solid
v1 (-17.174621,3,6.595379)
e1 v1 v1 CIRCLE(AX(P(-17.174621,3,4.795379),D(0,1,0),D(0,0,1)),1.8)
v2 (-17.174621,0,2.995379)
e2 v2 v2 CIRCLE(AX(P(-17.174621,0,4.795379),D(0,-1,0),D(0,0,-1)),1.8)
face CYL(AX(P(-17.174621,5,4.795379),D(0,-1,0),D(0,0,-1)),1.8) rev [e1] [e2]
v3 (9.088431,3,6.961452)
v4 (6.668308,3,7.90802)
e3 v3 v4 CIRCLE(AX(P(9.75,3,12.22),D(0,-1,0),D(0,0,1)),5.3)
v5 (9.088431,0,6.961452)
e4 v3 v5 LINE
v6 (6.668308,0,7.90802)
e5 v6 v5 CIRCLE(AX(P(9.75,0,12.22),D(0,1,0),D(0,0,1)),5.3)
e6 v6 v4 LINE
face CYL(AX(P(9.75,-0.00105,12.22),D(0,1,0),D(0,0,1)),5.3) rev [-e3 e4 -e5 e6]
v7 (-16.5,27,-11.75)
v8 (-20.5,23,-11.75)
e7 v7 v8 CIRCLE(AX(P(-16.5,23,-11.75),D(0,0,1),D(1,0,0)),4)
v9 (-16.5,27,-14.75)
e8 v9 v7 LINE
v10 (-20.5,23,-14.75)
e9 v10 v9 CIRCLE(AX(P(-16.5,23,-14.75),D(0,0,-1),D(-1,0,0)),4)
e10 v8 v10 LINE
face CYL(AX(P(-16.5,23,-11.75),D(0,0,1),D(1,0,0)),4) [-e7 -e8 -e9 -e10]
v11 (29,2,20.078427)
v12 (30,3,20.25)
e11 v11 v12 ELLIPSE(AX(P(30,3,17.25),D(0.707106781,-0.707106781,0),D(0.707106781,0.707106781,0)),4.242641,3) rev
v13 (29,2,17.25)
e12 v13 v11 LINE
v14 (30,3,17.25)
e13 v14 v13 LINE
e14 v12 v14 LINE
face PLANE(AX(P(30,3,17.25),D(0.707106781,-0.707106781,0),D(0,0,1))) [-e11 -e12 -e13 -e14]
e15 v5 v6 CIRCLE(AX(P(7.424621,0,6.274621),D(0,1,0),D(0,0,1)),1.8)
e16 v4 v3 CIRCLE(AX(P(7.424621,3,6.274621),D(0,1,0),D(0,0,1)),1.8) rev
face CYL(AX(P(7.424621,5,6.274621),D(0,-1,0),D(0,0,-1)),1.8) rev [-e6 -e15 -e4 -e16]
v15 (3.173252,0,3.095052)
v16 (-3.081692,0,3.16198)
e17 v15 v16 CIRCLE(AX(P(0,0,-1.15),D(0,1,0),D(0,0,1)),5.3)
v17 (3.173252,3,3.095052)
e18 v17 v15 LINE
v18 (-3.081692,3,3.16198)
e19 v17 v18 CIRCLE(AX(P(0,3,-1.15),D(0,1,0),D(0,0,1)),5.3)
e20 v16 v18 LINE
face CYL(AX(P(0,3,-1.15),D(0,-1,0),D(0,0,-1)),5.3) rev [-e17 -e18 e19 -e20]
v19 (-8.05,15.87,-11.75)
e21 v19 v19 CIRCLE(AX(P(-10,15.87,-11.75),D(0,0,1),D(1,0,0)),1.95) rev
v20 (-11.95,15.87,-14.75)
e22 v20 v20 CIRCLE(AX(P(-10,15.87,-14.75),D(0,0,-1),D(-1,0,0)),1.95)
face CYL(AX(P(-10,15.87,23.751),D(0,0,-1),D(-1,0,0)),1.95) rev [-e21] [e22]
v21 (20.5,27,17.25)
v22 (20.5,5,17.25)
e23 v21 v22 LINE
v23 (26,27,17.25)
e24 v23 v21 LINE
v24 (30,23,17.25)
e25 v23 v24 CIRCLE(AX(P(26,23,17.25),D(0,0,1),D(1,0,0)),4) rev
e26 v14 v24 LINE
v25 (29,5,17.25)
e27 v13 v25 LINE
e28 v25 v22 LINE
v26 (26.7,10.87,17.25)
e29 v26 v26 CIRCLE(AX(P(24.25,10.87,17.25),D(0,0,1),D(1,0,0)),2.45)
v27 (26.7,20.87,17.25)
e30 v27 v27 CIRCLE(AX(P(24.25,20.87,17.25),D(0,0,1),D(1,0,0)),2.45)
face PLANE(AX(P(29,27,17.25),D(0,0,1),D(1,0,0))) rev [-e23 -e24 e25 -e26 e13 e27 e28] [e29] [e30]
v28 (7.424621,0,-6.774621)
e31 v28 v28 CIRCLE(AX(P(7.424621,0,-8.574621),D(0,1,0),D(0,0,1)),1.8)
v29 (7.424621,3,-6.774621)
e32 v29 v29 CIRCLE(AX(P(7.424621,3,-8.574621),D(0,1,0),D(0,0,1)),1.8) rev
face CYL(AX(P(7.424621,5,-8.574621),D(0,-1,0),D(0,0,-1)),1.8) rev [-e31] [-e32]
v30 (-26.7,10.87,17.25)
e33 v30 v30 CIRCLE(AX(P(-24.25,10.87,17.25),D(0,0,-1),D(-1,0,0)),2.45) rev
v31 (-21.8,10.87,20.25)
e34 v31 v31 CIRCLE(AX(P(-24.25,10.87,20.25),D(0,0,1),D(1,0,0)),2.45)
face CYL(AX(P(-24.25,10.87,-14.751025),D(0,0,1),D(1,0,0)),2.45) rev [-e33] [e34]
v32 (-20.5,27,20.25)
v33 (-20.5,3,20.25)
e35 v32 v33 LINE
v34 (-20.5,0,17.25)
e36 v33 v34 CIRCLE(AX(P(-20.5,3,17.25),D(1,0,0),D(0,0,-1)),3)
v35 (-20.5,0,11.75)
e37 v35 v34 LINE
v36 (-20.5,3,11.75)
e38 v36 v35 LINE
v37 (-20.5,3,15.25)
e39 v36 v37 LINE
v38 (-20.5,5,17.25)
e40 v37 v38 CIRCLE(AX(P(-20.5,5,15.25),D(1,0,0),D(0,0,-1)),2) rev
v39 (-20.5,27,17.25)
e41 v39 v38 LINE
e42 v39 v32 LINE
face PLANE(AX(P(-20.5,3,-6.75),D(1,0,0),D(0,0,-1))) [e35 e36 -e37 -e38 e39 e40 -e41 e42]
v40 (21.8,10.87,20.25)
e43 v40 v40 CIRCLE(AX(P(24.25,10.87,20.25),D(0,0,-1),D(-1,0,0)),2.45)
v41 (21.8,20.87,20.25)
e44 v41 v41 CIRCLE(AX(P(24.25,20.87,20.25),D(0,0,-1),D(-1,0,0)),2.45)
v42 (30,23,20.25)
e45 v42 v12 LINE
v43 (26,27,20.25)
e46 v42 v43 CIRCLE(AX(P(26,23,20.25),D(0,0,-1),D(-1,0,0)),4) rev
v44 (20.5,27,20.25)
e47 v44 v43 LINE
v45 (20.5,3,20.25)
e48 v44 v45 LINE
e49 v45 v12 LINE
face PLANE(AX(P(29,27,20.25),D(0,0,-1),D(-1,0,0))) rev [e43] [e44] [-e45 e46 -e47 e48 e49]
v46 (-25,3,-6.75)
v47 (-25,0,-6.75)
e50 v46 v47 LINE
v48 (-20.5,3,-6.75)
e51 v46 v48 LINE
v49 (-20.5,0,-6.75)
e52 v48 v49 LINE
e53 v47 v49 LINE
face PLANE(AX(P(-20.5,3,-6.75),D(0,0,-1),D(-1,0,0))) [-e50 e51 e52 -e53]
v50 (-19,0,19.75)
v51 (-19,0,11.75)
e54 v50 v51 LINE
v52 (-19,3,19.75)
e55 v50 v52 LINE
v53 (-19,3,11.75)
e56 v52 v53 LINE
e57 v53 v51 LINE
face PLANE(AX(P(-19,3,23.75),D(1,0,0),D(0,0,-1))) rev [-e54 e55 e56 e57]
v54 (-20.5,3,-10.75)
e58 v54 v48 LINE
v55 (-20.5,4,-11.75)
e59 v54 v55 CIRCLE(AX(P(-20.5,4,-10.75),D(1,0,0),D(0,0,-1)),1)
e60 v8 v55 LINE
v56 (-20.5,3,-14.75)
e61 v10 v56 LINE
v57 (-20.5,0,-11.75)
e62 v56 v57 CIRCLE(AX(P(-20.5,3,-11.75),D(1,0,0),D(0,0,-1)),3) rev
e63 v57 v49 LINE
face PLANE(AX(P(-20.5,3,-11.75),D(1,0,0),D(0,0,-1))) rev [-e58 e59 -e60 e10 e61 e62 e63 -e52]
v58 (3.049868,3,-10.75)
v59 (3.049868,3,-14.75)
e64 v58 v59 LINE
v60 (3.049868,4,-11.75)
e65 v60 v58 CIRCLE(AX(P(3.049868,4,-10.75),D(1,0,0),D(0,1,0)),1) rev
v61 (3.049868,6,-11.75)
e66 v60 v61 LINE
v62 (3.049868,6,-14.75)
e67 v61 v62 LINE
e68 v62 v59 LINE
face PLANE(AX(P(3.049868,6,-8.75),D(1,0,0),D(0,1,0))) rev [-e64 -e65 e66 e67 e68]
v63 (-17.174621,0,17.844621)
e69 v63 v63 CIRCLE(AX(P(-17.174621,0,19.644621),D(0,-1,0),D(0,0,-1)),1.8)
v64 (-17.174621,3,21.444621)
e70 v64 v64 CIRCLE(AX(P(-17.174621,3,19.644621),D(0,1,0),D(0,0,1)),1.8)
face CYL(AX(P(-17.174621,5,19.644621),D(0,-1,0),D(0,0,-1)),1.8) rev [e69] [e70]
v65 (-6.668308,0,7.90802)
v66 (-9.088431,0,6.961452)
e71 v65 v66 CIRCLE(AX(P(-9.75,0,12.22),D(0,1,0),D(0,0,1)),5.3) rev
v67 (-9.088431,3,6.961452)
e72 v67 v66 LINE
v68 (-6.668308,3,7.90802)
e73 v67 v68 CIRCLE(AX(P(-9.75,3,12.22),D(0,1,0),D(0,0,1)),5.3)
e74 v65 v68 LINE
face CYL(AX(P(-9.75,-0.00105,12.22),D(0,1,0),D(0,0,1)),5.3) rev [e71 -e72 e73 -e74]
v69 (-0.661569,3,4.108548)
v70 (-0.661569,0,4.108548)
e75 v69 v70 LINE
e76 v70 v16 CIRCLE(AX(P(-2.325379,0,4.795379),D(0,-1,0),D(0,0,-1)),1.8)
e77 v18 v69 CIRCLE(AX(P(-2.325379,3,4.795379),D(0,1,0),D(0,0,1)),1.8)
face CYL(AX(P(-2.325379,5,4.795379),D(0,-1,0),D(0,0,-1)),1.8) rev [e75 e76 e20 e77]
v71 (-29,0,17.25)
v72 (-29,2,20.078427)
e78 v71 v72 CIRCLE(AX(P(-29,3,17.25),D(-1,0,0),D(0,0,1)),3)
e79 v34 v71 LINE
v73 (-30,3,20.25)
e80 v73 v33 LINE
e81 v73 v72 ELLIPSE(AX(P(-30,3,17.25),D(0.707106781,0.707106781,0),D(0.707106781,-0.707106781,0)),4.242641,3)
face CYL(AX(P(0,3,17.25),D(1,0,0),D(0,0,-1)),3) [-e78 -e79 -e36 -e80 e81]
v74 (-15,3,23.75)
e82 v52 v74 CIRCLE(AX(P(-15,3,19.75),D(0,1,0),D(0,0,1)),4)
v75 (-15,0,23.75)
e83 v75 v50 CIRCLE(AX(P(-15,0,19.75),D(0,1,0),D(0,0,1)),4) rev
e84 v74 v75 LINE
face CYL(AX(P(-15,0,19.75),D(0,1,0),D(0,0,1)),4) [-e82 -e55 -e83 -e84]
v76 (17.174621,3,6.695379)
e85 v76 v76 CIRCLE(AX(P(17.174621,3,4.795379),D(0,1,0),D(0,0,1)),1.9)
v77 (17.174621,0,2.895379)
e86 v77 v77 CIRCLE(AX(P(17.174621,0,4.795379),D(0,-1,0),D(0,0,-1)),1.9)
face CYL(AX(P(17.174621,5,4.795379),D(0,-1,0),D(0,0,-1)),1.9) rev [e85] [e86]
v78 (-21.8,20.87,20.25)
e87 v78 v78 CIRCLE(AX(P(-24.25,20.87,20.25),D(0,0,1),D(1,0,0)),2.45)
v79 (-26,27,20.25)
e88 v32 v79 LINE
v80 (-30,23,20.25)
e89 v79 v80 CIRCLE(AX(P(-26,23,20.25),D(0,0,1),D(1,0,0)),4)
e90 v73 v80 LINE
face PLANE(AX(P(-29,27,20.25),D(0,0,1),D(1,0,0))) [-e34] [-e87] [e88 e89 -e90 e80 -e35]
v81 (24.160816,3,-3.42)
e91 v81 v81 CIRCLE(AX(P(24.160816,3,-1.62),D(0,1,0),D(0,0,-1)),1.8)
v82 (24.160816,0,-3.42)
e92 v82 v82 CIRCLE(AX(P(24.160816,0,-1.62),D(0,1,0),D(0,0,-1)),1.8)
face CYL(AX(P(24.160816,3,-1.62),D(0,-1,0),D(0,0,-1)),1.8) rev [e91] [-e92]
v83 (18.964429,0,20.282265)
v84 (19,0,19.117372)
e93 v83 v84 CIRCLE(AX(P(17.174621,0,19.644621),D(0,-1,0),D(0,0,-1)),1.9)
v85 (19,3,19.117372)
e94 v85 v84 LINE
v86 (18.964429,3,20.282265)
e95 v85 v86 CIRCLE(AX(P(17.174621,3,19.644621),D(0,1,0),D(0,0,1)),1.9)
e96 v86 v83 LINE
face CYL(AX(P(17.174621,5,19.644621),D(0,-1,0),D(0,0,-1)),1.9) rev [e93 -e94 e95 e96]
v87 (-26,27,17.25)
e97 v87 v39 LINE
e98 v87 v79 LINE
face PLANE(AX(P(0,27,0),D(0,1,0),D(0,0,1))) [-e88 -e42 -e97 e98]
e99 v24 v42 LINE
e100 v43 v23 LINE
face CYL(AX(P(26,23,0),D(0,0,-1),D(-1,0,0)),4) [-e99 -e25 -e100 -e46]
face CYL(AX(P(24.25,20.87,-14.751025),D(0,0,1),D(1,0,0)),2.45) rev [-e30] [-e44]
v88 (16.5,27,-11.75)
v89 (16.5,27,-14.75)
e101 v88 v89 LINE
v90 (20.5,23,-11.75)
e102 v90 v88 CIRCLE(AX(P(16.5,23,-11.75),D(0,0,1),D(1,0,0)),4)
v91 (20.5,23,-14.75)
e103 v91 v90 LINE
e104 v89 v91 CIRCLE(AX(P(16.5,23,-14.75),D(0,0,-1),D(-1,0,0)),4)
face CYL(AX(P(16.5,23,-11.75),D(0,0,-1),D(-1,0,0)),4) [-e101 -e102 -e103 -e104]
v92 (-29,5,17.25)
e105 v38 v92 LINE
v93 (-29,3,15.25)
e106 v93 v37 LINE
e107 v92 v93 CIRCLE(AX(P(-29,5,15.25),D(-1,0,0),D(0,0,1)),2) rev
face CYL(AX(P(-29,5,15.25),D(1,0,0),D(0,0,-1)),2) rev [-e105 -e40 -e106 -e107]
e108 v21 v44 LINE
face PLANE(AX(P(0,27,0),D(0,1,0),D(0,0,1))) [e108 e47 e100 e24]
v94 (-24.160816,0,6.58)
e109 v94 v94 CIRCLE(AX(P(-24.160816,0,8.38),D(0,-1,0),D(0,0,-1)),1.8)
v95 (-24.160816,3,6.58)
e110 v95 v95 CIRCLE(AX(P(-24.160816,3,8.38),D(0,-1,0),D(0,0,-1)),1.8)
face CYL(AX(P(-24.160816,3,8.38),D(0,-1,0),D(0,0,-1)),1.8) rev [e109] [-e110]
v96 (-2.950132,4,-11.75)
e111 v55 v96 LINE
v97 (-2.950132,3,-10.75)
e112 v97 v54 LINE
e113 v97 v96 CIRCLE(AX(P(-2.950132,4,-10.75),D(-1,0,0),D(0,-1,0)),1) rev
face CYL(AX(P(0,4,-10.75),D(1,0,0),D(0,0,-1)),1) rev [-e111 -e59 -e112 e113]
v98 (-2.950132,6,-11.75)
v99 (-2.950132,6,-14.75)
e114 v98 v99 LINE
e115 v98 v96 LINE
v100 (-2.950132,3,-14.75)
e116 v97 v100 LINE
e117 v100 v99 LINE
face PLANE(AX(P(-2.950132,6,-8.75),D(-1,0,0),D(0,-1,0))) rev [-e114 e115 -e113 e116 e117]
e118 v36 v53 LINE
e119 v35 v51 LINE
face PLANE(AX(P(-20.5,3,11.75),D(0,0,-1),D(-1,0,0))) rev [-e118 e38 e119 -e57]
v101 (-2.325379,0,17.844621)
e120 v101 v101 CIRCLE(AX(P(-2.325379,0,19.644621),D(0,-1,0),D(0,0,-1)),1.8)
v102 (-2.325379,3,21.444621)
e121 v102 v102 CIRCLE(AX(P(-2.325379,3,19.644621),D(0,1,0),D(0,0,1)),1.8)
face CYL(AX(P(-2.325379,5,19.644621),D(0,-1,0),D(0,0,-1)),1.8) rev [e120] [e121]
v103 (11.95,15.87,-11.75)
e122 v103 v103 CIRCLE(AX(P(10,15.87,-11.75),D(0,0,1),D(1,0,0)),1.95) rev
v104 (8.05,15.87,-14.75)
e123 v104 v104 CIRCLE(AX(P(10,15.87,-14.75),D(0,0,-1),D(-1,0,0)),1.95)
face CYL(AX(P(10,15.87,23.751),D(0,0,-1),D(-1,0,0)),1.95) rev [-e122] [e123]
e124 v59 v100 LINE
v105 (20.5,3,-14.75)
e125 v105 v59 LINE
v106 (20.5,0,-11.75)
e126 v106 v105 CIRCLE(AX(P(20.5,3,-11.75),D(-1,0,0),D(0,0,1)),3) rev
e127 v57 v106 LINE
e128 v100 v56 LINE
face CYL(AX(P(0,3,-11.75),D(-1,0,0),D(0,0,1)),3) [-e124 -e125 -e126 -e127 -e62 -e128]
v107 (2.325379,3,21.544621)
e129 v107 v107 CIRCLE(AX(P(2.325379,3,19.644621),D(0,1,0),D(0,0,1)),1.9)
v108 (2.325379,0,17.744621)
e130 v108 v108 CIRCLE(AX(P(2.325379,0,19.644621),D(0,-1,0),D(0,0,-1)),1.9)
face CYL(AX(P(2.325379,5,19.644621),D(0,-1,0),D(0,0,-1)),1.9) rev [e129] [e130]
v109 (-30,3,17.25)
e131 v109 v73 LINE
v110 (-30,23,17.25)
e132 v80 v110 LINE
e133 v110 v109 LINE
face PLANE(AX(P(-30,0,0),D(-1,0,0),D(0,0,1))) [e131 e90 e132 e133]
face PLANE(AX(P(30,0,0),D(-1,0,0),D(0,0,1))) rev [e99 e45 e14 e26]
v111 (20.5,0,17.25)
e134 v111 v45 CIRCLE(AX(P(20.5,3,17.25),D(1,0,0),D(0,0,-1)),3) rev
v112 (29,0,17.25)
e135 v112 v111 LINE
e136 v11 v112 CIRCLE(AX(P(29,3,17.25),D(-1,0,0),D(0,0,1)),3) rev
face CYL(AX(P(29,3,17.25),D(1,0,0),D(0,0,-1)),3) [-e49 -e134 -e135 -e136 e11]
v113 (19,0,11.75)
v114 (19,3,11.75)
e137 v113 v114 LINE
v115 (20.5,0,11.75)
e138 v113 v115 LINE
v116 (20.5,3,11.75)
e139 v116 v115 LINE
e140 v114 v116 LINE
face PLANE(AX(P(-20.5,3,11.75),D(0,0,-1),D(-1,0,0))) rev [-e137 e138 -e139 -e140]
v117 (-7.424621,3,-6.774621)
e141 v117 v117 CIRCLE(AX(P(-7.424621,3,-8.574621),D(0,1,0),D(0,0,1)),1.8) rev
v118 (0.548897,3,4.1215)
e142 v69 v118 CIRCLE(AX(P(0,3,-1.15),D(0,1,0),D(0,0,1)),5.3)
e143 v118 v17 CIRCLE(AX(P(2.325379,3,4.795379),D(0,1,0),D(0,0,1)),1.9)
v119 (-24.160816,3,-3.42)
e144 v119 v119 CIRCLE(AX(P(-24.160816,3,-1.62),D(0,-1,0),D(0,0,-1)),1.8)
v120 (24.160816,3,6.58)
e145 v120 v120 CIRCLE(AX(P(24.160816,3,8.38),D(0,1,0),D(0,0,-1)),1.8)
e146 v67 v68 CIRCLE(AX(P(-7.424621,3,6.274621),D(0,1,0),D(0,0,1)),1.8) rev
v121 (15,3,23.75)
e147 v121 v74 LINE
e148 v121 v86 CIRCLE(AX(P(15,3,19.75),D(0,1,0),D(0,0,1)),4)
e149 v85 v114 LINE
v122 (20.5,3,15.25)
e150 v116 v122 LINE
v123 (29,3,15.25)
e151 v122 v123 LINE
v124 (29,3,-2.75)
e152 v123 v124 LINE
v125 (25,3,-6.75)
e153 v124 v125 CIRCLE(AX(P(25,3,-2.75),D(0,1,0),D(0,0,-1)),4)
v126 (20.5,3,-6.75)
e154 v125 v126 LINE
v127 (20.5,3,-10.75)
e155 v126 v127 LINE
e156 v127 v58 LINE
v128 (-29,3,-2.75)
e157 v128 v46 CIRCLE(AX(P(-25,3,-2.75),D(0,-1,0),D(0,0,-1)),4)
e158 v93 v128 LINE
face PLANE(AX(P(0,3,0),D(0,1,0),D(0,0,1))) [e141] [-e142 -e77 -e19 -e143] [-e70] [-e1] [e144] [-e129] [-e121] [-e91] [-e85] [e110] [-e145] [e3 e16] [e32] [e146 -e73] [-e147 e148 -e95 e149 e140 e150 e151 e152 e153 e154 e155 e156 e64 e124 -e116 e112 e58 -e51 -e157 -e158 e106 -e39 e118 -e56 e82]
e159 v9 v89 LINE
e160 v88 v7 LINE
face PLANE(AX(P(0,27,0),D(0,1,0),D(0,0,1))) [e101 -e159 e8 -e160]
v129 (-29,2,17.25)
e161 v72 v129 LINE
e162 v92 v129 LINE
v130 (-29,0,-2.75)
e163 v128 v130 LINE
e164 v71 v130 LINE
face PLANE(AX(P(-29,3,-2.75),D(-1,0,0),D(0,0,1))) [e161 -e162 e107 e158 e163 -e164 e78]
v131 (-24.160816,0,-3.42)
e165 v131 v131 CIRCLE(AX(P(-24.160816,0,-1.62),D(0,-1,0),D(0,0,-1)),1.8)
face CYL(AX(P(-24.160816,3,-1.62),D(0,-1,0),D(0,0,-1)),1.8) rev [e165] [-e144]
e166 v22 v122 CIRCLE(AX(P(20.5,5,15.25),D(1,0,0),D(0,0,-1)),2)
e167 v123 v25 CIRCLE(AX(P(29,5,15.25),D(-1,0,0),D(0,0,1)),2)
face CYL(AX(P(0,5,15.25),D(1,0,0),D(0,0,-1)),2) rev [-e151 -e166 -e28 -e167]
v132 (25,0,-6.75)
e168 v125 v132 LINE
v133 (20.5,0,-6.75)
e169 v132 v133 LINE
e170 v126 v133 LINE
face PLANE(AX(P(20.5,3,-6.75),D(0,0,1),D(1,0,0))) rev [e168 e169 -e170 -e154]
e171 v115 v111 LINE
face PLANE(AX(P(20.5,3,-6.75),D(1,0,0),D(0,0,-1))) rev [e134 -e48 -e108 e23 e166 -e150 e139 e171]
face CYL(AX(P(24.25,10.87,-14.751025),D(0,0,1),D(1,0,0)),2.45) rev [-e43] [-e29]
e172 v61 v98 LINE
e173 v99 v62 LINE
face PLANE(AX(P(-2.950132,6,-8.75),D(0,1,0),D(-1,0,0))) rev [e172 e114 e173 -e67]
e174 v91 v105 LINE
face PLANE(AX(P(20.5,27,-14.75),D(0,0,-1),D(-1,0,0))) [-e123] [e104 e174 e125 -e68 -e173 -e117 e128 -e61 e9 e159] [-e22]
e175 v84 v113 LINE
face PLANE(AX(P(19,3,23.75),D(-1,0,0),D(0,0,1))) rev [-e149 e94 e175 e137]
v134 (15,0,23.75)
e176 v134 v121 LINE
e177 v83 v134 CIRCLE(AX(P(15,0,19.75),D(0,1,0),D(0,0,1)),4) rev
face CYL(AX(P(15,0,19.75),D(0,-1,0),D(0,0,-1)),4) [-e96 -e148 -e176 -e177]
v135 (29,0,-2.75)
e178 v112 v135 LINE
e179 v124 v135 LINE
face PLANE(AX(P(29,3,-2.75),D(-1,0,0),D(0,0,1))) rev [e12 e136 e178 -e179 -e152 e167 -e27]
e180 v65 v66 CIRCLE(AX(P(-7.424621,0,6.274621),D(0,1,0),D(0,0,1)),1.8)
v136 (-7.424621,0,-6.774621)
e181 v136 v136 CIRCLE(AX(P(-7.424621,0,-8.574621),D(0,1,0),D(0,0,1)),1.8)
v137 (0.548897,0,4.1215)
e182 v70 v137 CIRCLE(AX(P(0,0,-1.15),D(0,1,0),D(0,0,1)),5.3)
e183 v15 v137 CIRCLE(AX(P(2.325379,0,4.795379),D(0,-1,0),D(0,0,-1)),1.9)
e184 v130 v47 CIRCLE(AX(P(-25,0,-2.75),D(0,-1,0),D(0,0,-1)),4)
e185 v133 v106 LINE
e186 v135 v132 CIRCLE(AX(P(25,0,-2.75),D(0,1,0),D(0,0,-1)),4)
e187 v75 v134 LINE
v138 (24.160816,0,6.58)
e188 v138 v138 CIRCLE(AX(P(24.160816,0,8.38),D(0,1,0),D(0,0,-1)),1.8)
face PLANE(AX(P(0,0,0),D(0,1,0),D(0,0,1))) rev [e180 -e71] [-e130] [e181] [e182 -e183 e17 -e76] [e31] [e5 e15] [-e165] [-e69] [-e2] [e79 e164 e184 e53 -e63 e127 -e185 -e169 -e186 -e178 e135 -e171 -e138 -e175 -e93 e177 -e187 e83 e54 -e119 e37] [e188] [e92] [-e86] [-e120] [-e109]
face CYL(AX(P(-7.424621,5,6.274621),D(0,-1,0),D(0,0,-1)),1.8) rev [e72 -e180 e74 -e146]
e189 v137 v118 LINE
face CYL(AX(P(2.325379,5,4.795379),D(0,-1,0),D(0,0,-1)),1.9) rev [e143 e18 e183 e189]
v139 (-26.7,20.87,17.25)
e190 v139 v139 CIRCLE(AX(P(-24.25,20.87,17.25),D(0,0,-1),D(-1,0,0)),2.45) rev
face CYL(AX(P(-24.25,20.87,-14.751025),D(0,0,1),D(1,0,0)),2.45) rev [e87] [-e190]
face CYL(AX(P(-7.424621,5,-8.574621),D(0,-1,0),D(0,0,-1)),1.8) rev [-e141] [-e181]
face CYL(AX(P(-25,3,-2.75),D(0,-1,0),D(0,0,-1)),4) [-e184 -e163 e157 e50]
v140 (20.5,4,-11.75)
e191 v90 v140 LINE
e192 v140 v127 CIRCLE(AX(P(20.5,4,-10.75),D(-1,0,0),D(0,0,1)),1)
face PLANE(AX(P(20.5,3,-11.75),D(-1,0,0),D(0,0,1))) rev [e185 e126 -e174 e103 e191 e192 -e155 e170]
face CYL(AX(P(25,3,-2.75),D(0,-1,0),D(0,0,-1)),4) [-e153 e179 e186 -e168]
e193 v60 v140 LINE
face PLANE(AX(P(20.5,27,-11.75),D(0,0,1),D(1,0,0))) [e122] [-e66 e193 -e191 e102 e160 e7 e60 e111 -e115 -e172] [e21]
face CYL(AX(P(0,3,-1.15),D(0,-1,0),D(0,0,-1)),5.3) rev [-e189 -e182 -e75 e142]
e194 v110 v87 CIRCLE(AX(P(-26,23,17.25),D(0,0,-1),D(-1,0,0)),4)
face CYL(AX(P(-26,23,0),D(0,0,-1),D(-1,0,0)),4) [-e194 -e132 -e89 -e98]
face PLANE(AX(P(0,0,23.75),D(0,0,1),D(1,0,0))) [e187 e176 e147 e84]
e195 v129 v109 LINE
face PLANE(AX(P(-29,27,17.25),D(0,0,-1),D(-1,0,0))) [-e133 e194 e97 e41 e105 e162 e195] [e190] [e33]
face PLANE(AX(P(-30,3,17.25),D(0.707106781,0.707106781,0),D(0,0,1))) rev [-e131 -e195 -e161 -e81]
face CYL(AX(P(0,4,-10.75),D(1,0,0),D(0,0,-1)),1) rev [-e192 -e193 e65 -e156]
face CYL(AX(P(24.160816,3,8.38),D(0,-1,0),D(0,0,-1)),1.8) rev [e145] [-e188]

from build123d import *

# Parameters (mm, degrees)
CROQUIS1_W              = 41
CROQUIS1_H              = 23.5
CROQUIS1_R              = 5.3
SALIENTE_EXTRUIR1_DEPTH = 3
CROQUIS3_W              = 41
CROQUIS3_H              = 3
SALIENTE_EXTRUIR2_DEPTH = 27
CROQUIS4_R              = 1.8
SALIENTE_EXTRUIR3_DEPTH = 3
CROQUIS5_W              = 8.5
CROQUIS5_H              = 3
SALIENTE_EXTRUIR4_DEPTH = 27
CROQUIS6_W              = 38
CROQUIS6_H              = 3
SALIENTE_EXTRUIR5_DEPTH = 12
CORTAR_EXTRUIR3_REACH   = 54.868
CROQUIS10_R             = 2.45
CROQUIS16_W             = 3
CROQUIS16_H             = 24
SALIENTE_EXTRUIR6_DEPTH = 1
CROQUIS17_W             = 3
CROQUIS17_H             = 24
SALIENTE_EXTRUIR7_DEPTH = 1
CORTAR_EXTRUIR1_REACH   = 47.167
CROQUIS8_R              = 5.3
CORTAR_EXTRUIR2_REACH   = 57.779
CROQUIS9_R              = 1.95
REDONDEO1_R             = 4
REDONDEO2_R             = 3
REDONDEO3_R             = 1
REDONDEO4_R             = 2
CROQUIS11_R             = 1.8
CORTAR_EXTRUIR4_DEPTH   = 5
CROQUIS12_R             = 1.8
CORTAR_EXTRUIR5_DEPTH   = 5
CROQUIS14_R             = 1.9
CORTAR_EXTRUIR6_DEPTH   = 5
CROQUIS15_W             = 6
CROQUIS15_H             = 3
CORTAR_EXTRUIR7_DEPTH   = 6
CHAFL_N1_SIZE           = 1


with BuildPart() as part:
    # Croquis1 → Saliente-Extruir1 (new body)
    with BuildSketch(Plane(origin=(0, 0, 0), x_dir=(1, 0, 0), z_dir=(0, 1, 0))):
        Rectangle(CROQUIS1_W, CROQUIS1_H)
        with Locations(Location((0, 1.15, 0), (0, 0, 270))):
            Circle(CROQUIS1_R, mode=Mode.SUBTRACT)
    extrude(amount=SALIENTE_EXTRUIR1_DEPTH)

    # Croquis3 → Saliente-Extruir2 (add)
    with BuildSketch(Plane.XZ):
        with Locations((0, -13.25)):
            Rectangle(CROQUIS3_W, CROQUIS3_H)
    extrude(amount=-SALIENTE_EXTRUIR2_DEPTH)

    # Croquis4 → Saliente-Extruir3 (add)
    with BuildSketch(Plane.XZ):
        with BuildLine():
            Line((-20.5, -6.75), (-25, -6.75))
            ThreePointArc((-25, -6.75), (-27.828427125, -5.578427125), (-29, -2.75))
            Line((-29, -2.75), (-29, 17.25))
            Line((-29, 17.25), (-20.5, 17.25))
            Line((-20.5, 17.25), (-20.5, -6.75))
        make_face()
        with Locations(Location((-24.160816052, -1.62, 0), (0, 0, 270))):
            Circle(CROQUIS4_R, mode=Mode.SUBTRACT)
        with Locations(Location((-24.160816052, 8.38, 0), (0, 0, 270))):
            Circle(CROQUIS4_R, mode=Mode.SUBTRACT)
    saliente_extruir3 = extrude(amount=-SALIENTE_EXTRUIR3_DEPTH)

    # Croquis5 → Saliente-Extruir4 (add)
    with BuildSketch(Plane.XZ):
        with Locations((-24.75, 18.75)):
            Rectangle(CROQUIS5_W, CROQUIS5_H)
    saliente_extruir4 = extrude(amount=-SALIENTE_EXTRUIR4_DEPTH)

    # Croquis6 → Saliente-Extruir5 (add)
    with BuildSketch(Plane.XY.offset(11.75)):
        with Locations((0, 1.5)):
            Rectangle(CROQUIS6_W, CROQUIS6_H)
    extrude(amount=SALIENTE_EXTRUIR5_DEPTH)

    # Croquis10 → Cortar-Extruir3 (cut, up to next)
    with BuildSketch(Plane.XY.offset(20.25), mode=Mode.PRIVATE) as cortar_extruir3_sk1:
        with Locations((-24.25, 10.87)):
            Circle(CROQUIS10_R)
    cortar_extruir3_tool1 = extrude(cortar_extruir3_sk1.sketch, amount=-CORTAR_EXTRUIR3_REACH, mode=Mode.PRIVATE) & part.part
    # Croquis10 → Cortar-Extruir3 (cut, up to next)
    with BuildSketch(Plane.XY.offset(20.25), mode=Mode.PRIVATE) as cortar_extruir3_sk2:
        with Locations((-24.25, 20.87)):
            Circle(CROQUIS10_R)
    cortar_extruir3_tool2 = extrude(cortar_extruir3_sk2.sketch, amount=-CORTAR_EXTRUIR3_REACH, mode=Mode.PRIVATE) & part.part
    cortar_extruir3_1 = cortar_extruir3_tool1.solids().sort_by_distance((-24.25, 10.87, 20.25))[0]
    add(cortar_extruir3_1, mode=Mode.SUBTRACT)
    cortar_extruir3_2 = cortar_extruir3_tool2.solids().sort_by_distance((-24.25, 20.87, 20.25))[0]
    add(cortar_extruir3_2, mode=Mode.SUBTRACT)
    cortar_extruir3 = cortar_extruir3_1 + cortar_extruir3_2  # Cortar-Extruir3 as one shape, for the pattern or mirror that repeats it

    # Simetría3: Saliente-Extruir3, Saliente-Extruir4, Cortar-Extruir3 across plane
    add(saliente_extruir3.mirror(Plane(origin=(0, 0, 0), x_dir=(0, 0, 1), z_dir=(1, 0, 0))))
    add(saliente_extruir4.mirror(Plane(origin=(0, 0, 0), x_dir=(0, 0, 1), z_dir=(1, 0, 0))))
    add(cortar_extruir3.mirror(Plane(origin=(0, 0, 0), x_dir=(0, 0, 1), z_dir=(1, 0, 0))), mode=Mode.SUBTRACT)

    # Croquis16 → Saliente-Extruir6 (add)
    with BuildSketch(Plane(origin=(29, 0, 0), x_dir=(0, 0, -1), z_dir=(1, 0, 0))):
        with Locations((-18.75, 15)):
            Rectangle(CROQUIS16_W, CROQUIS16_H)
    extrude(amount=SALIENTE_EXTRUIR6_DEPTH)

    # Croquis17 → Saliente-Extruir7 (add)
    with BuildSketch(Plane.ZY.offset(29)):
        with Locations((18.75, 15)):
            Rectangle(CROQUIS17_W, CROQUIS17_H)
    extrude(amount=SALIENTE_EXTRUIR7_DEPTH)

    # Croquis8 → Cortar-Extruir1 (cut, up to next)
    with BuildSketch(Plane(origin=(0, 3, 0), x_dir=(1, 0, 0), z_dir=(0, 1, 0)), mode=Mode.PRIVATE) as cortar_extruir1_sk1:
        with Locations(Location((-9.75, -12.22, 0), (0, 0, 270))):
            Circle(CROQUIS8_R)
    cortar_extruir1_tool1 = extrude(cortar_extruir1_sk1.sketch, amount=-CORTAR_EXTRUIR1_REACH, mode=Mode.PRIVATE) & part.part
    cortar_extruir1 = cortar_extruir1_tool1.solids().sort_by_distance((-9.75, 3, 12.22))[0]
    add(cortar_extruir1, mode=Mode.SUBTRACT)

    # Simetría4: Cortar-Extruir1 across plane
    add(cortar_extruir1.mirror(Plane(origin=(0, 0, 0), x_dir=(0, 0, 1), z_dir=(1, 0, 0))), mode=Mode.SUBTRACT)

    # Croquis9 → Cortar-Extruir2 (cut, up to next)
    with BuildSketch(Plane(origin=(0, 0, -14.75), x_dir=(-1, 0, 0), z_dir=(0, 0, -1)), mode=Mode.PRIVATE) as cortar_extruir2_sk1:
        with Locations((-10, 15.87)):
            Circle(CROQUIS9_R)
    cortar_extruir2_tool1 = extrude(cortar_extruir2_sk1.sketch, amount=-CORTAR_EXTRUIR2_REACH, mode=Mode.PRIVATE) & part.part
    # Croquis9 → Cortar-Extruir2 (cut, up to next)
    with BuildSketch(Plane(origin=(0, 0, -14.75), x_dir=(-1, 0, 0), z_dir=(0, 0, -1)), mode=Mode.PRIVATE) as cortar_extruir2_sk2:
        with Locations((10, 15.87)):
            Circle(CROQUIS9_R)
    cortar_extruir2_tool2 = extrude(cortar_extruir2_sk2.sketch, amount=-CORTAR_EXTRUIR2_REACH, mode=Mode.PRIVATE) & part.part
    add(cortar_extruir2_tool1.solids().sort_by_distance((10, 15.87, -14.75))[0], mode=Mode.SUBTRACT)
    add(cortar_extruir2_tool2.solids().sort_by_distance((-10, 15.87, -14.75))[0], mode=Mode.SUBTRACT)

    # Redondeo1
    redondeo1_edges = [part.edges().sort_by_distance(p)[0] for p in [
        (-19, 1.5, 23.75),
        (19, 1.5, 23.75),
        (20.5, 27, -13.25),
        (-20.5, 27, -13.25),
        (-30, 27, 18.75),
        (30, 27, 18.75),
    ]]
    fillet(redondeo1_edges, radius=REDONDEO1_R)

    # Redondeo2
    redondeo2_edges = [part.edges().sort_by_distance(p)[0] for p in [
        (24.75, 0, 20.25),
        (0, 0, -14.75),
        (-24.75, 0, 20.25),
    ]]
    fillet(redondeo2_edges, radius=REDONDEO2_R)

    # Redondeo3
    redondeo3_edges = [part.edges().sort_by_distance(p)[0] for p in [
        (0, 3, -11.75),
    ]]
    fillet(redondeo3_edges, radius=REDONDEO3_R)

    # Redondeo4
    redondeo4_edges = [part.edges().sort_by_distance(p)[0] for p in [
        (24.75, 3, 17.25),
        (-24.75, 3, 17.25),
    ]]
    fillet(redondeo4_edges, radius=REDONDEO4_R)

    # Croquis11 → Cortar-Extruir4 (cut)
    with BuildSketch(Plane(origin=(0, 0, 0), x_dir=(1, 0, 0), z_dir=(0, 1, 0))):
        with Locations((7.424621202, -6.274621202)):
            Circle(CROQUIS11_R)
        with Locations((-7.424621202, -6.274621202)):
            Circle(CROQUIS11_R)
        with Locations(Location((-7.424621202, 8.574621202, 0), (0, 0, 270))):
            Circle(CROQUIS11_R)
        with Locations(Location((7.424621202, 8.574621202, 0), (0, 0, 270))):
            Circle(CROQUIS11_R)
    extrude(amount=CORTAR_EXTRUIR4_DEPTH, mode=Mode.SUBTRACT)

    # Croquis12 → Cortar-Extruir5 (cut)
    with BuildSketch(Plane.XZ):
        with Locations(Location((-2.325378798, 19.644621202, 0), (0, 0, 270))):
            Circle(CROQUIS12_R)
        with Locations((-2.325378798, 4.795378798)):
            Circle(CROQUIS12_R)
        with Locations(Location((-17.174621202, 4.795378798, 0), (0, 0, 270))):
            Circle(CROQUIS12_R)
        with Locations(Location((-17.174621202, 19.644621202, 0), (0, 0, 270))):
            Circle(CROQUIS12_R)
    extrude(amount=-CORTAR_EXTRUIR5_DEPTH, mode=Mode.SUBTRACT)

    # Croquis14 → Cortar-Extruir6 (cut)
    with BuildSketch(Plane.XZ):
        with Locations((17.174621202, 19.644621202)):
            Circle(CROQUIS14_R)
        with Locations(Location((17.174621202, 4.795378798, 0), (0, 0, 270))):
            Circle(CROQUIS14_R)
        with Locations((2.325378798, 4.795378798)):
            Circle(CROQUIS14_R)
        with Locations(Location((2.325378798, 19.644621202, 0), (0, 0, 270))):
            Circle(CROQUIS14_R)
    extrude(amount=-CORTAR_EXTRUIR6_DEPTH, mode=Mode.SUBTRACT)

    # Croquis15 → Cortar-Extruir7 (cut)
    with BuildSketch(Plane(origin=(0, 0, -14.75), x_dir=(-1, 0, 0), z_dir=(0, 0, -1))):
        with Locations((-0.0498677, 4.5)):
            Rectangle(CROQUIS15_W, CROQUIS15_H)
    extrude(amount=-CORTAR_EXTRUIR7_DEPTH, mode=Mode.SUBTRACT)

    # Chaflán1
    # the kernel refuses this chamfer: 1 mm, written as the material it adds along each edge
    with BuildSketch(Plane(origin=(29, 3, 22.821682988), x_dir=(-0.02749587661058563, -0.9996219169112968, 0), z_dir=(0, 0, -1))) as chafl_n1_piece_1_section:
        Polygon((CHAFL_N1_SIZE * 0.999621916911, -CHAFL_N1_SIZE * 0.0274958766106), (-CHAFL_N1_SIZE * 0.0274958766106, -CHAFL_N1_SIZE * 0.999621916911), (0, 0), align=None)
    chafl_n1_piece_1 = extrude(amount=5.571682988, mode=Mode.PRIVATE)
    chafl_n1_piece_1 = chafl_n1_piece_1 & Plane(origin=(29.334600076, 3, 17.25), x_dir=(0, -1, 0), z_dir=(1, 0, 0)) * Cylinder(3, 16, mode=Mode.PRIVATE)
    add(chafl_n1_piece_1)
    with BuildSketch(Plane(origin=(-29, 3, 22.821682988), x_dir=(0.02749587661058563, -0.9996219169112968, 0), z_dir=(0, 0, -1))) as chafl_n1_piece_2_section:
        Polygon((CHAFL_N1_SIZE * 0.999621916911, CHAFL_N1_SIZE * 0.0274958766106), (-CHAFL_N1_SIZE * 0.0274958766106, CHAFL_N1_SIZE * 0.999621916911), (0, 0), align=None)
    chafl_n1_piece_2 = extrude(amount=5.571682988, mode=Mode.PRIVATE)
    chafl_n1_piece_2 = chafl_n1_piece_2 & Plane(origin=(-29.334600076, 3, 17.25), x_dir=(0, -1, 0), z_dir=(-1, 0, 0)) * Cylinder(3, 16, mode=Mode.PRIVATE)
    add(chafl_n1_piece_2)


solid = part.part
